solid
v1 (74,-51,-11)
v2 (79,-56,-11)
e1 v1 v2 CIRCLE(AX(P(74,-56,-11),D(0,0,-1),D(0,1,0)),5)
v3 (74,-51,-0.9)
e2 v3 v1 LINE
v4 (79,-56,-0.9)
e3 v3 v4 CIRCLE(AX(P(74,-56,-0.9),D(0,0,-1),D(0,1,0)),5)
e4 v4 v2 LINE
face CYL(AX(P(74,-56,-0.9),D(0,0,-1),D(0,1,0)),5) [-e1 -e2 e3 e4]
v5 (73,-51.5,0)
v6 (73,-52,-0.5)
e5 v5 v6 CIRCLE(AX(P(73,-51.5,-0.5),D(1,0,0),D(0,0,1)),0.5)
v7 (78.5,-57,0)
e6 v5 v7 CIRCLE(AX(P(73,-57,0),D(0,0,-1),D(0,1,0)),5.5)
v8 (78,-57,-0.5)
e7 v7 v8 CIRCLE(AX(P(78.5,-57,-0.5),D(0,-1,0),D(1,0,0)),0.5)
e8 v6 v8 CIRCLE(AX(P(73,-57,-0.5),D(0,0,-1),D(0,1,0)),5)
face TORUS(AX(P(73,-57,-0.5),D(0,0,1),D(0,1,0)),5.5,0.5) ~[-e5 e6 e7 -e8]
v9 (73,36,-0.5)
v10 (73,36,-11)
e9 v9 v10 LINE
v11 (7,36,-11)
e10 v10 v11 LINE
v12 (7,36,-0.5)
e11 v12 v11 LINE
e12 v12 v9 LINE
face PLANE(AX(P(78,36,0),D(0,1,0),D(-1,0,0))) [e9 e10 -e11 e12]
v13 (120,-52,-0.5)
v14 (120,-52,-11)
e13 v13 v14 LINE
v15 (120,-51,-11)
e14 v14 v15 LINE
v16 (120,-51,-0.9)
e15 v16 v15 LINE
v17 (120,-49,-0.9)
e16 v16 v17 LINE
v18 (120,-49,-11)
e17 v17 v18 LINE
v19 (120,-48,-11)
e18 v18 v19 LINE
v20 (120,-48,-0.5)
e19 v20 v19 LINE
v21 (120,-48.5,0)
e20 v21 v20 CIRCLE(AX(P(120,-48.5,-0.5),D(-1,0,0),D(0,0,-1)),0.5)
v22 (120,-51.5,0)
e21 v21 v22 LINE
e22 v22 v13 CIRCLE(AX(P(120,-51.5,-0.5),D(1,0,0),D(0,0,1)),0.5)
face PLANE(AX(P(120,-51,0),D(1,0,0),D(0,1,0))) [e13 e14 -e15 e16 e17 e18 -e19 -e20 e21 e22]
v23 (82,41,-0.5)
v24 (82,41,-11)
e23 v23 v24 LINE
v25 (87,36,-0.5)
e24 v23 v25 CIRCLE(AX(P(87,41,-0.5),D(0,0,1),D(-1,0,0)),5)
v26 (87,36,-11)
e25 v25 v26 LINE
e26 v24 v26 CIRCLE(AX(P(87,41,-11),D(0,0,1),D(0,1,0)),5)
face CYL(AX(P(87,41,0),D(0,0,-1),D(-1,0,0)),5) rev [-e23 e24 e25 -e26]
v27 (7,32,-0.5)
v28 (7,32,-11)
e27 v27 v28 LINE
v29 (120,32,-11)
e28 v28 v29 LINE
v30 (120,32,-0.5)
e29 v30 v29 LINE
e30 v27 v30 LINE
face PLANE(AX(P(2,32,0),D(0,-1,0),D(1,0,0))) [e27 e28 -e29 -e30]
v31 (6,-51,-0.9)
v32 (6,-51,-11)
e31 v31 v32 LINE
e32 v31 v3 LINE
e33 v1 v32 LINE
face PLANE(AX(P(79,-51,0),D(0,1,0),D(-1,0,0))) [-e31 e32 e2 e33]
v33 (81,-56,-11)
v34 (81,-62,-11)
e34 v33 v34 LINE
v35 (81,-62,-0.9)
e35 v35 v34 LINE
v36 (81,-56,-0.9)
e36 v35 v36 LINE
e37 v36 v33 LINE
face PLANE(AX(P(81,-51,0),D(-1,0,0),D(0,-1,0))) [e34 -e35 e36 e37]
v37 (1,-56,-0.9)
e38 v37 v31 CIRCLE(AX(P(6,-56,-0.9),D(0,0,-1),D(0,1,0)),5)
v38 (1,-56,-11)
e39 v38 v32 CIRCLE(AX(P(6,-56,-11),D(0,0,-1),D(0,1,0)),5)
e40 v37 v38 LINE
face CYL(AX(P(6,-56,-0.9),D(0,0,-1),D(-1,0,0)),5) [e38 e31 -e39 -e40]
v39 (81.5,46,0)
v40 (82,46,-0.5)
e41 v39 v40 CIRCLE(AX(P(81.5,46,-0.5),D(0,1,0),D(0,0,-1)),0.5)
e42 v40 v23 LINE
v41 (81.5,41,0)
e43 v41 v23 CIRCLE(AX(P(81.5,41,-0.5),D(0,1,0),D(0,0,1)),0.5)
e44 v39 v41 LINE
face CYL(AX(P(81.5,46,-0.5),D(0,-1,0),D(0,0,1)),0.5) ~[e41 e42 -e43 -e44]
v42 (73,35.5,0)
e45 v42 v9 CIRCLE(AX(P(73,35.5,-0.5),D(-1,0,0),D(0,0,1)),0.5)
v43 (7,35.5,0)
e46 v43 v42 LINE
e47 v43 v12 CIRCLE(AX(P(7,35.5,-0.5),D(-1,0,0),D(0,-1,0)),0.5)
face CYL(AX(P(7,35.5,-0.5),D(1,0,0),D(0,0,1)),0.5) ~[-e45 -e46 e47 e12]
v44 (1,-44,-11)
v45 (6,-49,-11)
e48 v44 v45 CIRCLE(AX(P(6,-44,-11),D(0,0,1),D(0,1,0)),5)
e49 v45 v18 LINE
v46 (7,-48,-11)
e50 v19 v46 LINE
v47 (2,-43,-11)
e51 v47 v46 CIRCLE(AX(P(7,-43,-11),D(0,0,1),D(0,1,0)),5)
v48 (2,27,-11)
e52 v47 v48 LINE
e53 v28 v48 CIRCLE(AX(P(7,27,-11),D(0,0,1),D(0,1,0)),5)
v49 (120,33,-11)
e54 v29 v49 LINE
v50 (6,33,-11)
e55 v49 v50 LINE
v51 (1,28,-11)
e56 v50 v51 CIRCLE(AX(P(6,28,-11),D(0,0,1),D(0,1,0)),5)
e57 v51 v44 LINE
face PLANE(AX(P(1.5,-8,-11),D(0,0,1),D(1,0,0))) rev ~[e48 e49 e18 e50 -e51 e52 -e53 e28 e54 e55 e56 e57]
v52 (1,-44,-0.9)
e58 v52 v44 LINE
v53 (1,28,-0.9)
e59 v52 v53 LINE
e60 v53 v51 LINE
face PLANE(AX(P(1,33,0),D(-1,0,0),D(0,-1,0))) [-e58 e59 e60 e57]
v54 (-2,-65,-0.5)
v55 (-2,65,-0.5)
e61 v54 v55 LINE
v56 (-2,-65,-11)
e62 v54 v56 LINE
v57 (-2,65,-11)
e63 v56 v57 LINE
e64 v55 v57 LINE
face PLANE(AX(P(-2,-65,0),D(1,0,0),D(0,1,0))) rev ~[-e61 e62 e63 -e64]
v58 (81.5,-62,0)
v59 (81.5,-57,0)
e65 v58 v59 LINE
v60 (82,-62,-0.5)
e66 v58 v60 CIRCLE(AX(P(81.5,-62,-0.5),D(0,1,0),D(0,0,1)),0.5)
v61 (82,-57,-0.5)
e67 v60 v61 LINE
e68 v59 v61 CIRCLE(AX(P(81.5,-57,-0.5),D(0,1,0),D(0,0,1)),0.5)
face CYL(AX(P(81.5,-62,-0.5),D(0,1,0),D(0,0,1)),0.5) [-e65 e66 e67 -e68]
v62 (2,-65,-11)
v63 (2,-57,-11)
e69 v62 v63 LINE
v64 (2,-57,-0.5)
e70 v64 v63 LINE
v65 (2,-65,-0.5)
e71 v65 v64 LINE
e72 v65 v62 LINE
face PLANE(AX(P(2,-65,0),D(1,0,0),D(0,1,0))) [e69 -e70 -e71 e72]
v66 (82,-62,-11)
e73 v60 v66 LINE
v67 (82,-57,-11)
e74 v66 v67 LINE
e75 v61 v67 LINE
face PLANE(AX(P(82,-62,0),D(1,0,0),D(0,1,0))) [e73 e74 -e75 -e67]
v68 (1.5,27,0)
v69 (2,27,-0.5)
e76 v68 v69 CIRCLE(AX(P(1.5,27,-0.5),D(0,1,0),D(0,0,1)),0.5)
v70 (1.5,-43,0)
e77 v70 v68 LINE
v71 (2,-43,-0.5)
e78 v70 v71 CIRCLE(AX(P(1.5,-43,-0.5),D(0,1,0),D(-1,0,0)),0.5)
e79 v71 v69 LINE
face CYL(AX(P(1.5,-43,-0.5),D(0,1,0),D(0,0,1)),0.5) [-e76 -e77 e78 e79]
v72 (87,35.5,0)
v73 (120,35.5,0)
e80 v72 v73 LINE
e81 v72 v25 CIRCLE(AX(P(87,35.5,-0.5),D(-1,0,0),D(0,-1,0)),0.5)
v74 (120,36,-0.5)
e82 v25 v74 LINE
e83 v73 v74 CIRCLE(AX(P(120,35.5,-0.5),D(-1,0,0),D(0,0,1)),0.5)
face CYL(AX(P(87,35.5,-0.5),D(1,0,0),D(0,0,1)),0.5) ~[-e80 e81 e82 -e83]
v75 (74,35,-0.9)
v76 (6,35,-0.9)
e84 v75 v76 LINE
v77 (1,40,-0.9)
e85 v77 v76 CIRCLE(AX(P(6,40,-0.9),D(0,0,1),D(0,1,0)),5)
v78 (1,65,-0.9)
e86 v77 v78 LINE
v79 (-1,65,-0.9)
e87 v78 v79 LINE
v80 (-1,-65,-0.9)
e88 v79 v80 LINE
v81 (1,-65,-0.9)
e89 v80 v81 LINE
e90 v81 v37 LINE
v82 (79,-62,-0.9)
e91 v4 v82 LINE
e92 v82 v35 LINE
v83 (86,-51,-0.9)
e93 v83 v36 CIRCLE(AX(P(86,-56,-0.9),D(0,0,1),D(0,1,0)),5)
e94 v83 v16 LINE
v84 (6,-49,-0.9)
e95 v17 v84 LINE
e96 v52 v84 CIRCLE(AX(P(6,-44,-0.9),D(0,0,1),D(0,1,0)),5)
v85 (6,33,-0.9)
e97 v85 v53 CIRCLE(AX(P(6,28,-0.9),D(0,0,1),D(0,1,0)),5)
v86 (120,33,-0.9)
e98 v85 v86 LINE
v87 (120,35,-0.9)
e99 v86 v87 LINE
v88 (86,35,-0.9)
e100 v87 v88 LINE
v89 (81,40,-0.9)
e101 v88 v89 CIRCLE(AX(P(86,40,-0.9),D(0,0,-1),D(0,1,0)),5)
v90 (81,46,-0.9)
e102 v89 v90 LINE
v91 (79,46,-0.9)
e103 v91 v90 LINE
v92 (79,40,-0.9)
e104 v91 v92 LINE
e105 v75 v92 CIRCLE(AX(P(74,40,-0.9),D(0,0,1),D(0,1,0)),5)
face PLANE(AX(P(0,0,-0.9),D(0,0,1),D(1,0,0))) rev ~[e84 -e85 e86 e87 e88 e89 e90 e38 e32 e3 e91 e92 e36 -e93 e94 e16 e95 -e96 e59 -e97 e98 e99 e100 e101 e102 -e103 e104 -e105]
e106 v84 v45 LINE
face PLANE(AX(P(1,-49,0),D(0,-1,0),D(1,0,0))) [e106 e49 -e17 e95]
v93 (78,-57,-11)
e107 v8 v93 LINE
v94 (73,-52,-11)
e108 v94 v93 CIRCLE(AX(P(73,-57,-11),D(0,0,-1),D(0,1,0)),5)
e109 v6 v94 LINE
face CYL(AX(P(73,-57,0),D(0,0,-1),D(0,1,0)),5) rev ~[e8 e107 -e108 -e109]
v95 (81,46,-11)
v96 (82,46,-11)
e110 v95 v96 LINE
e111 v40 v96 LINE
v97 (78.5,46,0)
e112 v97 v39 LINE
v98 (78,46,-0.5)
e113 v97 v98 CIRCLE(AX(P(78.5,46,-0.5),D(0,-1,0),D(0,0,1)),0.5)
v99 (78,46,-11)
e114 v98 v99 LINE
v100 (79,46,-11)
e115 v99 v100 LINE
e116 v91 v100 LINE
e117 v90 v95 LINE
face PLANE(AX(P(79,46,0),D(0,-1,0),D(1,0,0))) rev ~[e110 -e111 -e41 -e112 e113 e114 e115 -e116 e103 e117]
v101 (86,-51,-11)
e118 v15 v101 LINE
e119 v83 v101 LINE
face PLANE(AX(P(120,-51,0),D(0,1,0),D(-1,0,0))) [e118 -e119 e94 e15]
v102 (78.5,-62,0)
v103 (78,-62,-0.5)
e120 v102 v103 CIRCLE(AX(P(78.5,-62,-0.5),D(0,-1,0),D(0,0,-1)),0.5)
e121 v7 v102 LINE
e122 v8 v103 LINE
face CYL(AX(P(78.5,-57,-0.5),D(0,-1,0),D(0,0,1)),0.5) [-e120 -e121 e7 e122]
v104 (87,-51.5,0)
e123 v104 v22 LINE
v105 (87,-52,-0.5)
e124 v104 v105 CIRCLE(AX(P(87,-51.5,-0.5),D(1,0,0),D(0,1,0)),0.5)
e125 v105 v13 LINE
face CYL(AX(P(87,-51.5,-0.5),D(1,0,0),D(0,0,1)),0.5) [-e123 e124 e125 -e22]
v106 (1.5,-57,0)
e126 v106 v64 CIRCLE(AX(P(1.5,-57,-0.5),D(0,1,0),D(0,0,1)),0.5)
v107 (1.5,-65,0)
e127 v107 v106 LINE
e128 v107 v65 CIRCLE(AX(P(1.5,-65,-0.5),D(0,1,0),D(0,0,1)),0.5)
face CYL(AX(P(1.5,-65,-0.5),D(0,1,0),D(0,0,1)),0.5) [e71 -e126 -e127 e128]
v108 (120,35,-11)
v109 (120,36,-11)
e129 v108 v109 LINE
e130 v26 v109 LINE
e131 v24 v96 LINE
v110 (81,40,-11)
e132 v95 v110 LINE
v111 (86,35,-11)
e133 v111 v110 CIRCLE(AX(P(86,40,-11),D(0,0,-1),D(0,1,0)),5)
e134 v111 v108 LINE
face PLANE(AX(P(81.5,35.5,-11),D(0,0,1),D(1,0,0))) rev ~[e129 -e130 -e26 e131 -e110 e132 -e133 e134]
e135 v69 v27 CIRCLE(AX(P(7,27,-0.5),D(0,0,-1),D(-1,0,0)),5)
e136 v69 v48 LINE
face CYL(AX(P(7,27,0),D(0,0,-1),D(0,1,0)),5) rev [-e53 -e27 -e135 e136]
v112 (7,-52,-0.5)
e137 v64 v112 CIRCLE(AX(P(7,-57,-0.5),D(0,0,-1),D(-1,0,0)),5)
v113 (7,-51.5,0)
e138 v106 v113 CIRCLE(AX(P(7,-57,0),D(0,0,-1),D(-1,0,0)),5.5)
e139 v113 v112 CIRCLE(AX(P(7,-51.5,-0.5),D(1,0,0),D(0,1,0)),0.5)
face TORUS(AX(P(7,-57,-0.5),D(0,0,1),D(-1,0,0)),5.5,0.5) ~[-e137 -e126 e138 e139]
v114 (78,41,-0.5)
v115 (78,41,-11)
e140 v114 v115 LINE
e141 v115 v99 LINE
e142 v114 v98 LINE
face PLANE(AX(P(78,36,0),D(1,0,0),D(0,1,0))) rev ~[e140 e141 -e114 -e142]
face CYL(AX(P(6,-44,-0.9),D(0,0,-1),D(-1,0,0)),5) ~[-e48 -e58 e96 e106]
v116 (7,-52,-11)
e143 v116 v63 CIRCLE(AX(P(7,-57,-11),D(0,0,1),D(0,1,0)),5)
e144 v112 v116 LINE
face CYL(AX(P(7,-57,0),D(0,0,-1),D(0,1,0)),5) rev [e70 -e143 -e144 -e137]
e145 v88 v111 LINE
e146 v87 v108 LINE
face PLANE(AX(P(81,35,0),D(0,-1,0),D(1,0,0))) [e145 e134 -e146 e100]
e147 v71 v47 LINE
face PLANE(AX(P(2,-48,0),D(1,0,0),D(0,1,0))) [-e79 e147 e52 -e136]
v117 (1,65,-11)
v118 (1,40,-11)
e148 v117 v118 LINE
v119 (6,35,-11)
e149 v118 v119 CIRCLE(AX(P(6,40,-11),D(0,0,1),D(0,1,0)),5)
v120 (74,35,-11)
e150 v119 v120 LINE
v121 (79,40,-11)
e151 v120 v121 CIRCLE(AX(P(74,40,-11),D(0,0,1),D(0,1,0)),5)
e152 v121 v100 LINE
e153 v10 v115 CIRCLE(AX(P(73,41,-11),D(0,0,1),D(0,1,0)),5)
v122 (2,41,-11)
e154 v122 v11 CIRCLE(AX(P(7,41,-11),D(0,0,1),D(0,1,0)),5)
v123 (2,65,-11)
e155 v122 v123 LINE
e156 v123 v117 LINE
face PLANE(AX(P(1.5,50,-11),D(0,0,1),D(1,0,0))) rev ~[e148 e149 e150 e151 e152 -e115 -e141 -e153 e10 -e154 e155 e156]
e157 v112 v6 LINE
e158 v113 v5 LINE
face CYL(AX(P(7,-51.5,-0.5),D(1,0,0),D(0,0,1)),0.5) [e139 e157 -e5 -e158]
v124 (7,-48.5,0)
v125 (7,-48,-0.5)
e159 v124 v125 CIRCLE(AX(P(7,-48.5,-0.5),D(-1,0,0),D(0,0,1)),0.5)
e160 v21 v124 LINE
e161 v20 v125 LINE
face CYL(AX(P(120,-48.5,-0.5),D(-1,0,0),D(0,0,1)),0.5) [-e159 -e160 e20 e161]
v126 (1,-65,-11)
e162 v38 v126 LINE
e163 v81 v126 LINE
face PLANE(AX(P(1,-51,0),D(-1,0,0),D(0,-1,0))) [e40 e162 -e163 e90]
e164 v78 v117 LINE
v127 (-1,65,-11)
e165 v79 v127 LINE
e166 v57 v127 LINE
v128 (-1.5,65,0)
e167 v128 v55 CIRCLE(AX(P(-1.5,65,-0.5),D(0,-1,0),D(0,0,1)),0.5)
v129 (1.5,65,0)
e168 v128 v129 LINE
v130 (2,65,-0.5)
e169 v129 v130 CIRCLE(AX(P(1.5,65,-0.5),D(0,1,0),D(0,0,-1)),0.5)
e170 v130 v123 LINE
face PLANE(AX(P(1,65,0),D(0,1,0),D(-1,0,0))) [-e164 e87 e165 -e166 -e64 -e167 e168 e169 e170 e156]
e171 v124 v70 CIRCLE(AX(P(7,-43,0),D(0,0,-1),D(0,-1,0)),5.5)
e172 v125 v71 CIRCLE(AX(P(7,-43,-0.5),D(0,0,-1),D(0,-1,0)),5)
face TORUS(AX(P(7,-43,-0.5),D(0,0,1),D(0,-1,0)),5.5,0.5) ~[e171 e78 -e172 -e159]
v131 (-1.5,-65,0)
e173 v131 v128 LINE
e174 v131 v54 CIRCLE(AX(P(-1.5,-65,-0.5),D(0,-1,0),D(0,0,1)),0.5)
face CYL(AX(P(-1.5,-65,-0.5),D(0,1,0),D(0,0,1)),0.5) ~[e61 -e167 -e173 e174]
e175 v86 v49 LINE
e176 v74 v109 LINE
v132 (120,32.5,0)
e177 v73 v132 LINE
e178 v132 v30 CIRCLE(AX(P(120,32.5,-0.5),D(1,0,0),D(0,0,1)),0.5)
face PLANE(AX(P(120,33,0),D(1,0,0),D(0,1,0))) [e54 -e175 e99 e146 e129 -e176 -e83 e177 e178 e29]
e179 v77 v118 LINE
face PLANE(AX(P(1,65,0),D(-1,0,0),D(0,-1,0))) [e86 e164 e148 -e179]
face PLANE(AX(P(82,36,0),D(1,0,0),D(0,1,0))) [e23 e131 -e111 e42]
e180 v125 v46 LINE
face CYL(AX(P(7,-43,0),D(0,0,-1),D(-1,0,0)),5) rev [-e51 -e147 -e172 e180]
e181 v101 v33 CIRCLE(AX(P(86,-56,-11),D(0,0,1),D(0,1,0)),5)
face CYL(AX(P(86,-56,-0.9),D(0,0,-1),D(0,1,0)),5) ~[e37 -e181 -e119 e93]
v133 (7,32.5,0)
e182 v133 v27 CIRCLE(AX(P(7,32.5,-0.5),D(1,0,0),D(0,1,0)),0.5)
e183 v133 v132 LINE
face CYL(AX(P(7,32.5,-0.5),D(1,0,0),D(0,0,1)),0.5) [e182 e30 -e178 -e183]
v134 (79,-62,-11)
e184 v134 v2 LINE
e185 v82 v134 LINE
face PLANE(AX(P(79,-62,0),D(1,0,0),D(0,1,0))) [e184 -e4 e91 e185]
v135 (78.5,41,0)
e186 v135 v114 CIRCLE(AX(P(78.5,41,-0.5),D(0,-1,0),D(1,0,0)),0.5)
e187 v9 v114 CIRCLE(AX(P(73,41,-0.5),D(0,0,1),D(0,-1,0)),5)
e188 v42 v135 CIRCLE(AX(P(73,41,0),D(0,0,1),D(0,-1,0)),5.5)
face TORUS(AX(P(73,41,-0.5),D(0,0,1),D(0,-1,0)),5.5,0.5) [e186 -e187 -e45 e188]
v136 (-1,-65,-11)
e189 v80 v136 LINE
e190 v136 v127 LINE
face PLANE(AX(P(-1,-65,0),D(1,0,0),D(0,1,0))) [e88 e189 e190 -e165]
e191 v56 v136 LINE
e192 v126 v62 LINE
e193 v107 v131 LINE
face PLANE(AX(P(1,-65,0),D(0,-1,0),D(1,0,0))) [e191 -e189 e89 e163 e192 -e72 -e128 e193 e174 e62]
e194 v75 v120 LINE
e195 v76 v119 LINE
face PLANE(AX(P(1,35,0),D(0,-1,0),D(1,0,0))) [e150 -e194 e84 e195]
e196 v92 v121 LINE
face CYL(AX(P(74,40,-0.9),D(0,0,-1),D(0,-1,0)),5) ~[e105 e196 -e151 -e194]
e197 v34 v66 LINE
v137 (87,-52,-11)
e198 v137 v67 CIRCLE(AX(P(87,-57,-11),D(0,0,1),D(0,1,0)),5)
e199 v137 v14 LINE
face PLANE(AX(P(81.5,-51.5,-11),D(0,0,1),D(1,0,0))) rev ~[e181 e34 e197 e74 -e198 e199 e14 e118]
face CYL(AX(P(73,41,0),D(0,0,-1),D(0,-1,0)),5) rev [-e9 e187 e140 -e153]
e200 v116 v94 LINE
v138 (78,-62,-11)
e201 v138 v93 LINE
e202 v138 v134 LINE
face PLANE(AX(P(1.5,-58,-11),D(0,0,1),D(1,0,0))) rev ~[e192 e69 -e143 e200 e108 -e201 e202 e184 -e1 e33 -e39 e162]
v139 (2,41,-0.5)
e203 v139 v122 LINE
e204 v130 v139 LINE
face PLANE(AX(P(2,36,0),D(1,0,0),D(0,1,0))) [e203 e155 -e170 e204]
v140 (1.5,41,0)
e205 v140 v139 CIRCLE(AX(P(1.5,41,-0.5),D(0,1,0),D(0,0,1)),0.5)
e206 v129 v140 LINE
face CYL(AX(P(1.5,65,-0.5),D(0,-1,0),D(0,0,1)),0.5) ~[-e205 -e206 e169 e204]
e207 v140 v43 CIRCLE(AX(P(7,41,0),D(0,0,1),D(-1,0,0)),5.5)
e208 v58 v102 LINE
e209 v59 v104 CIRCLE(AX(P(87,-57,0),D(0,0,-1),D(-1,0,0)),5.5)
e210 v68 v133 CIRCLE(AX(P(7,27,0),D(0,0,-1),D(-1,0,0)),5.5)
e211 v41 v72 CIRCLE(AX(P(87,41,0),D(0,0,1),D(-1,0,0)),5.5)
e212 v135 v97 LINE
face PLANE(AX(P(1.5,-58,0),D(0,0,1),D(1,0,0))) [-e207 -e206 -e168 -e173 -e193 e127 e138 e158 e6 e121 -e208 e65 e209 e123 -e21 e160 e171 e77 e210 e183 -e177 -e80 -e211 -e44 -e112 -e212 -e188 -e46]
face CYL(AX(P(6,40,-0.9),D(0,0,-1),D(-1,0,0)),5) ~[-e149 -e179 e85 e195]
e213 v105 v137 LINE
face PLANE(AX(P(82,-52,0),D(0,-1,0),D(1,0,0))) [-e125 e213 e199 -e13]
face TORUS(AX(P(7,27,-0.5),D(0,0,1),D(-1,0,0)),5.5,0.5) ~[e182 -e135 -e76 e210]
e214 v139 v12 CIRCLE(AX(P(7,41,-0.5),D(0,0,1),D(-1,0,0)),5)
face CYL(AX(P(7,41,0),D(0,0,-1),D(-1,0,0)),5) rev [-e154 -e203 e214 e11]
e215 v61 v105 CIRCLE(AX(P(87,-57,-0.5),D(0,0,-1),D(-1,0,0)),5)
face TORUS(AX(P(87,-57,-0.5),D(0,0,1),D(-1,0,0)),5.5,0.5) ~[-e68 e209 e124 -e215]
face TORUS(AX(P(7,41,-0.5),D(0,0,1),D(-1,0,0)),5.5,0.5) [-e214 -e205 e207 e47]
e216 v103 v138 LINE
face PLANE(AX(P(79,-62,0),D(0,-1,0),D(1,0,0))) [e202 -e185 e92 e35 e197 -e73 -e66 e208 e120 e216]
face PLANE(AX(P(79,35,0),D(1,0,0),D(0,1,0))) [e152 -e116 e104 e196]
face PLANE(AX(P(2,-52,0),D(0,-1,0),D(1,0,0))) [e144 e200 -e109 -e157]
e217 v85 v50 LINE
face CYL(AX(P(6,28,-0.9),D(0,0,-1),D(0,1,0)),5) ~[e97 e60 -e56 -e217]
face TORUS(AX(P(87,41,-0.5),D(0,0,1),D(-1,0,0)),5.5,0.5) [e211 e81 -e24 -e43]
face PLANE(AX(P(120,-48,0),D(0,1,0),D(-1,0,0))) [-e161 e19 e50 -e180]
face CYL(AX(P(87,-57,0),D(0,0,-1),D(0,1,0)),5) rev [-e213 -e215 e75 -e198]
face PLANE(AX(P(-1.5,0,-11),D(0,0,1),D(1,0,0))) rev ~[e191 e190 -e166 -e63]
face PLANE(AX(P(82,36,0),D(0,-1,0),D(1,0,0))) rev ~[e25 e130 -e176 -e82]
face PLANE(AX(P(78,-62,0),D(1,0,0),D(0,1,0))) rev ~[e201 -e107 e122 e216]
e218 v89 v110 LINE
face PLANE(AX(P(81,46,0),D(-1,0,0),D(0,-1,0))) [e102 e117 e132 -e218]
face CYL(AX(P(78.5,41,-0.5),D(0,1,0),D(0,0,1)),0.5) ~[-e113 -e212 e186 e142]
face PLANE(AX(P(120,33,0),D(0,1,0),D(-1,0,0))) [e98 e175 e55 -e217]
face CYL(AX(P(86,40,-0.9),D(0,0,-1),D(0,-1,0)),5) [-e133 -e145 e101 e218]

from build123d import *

# Parameters (mm, degrees)
F0_W     = 2
F0_H     = 10
F0_H_2   = 1
F1_DEPTH = 0.9
F0_W_2   = 1
F0_H_3   = 130
F0_W_3   = 76
F0_W_4   = 38
F2_DEPTH = 11
F3_R     = 5
F4_R     = 0.5


with BuildPart() as f1:
    # F0 (on Top) → F1 (new body)
    with BuildSketch(Plane.XY):
        Polygon((-1, -65), (1, -65), (1, -51), (1, -49), (1, 33), (1, 35), (1, 65), (-1, 65), align=None)
        Polygon((1, 35), (1, 33), (2, 33), (79, 33), (81, 33), (120, 33), (120, 35), (82, 35), (81, 35), (79, 35), (78, 35), (2, 35), align=None)
        with Locations((80, 41)):
            Rectangle(F0_W, F0_H)
        with Locations((80, 35.5)):
            Rectangle(F0_W, F0_H_2)
        Polygon((1, -49), (1, -51), (2, -51), (78, -51), (79, -51), (81, -51), (82, -51), (120, -51), (120, -49), (81, -49), (79, -49), (2, -49), align=None)
        with Locations((80, -57)):
            Rectangle(F0_W, F0_H)
        with Locations((80, -51.5)):
            Rectangle(F0_W, F0_H_2)
    extrude(amount=-F1_DEPTH)

    # F0 (on Top) → F2 (join)
    with BuildSketch(Plane.XY):
        Polygon((1, -51), (1, -65), (2, -65), (2, -52), (2, -51), align=None)
        with Locations((-1.5, 0)):
            Rectangle(F0_W_2, F0_H_3)
        Polygon((1, 33), (1, -49), (2, -49), (2, -48), (2, 32), (2, 33), align=None)
        with Locations((40, -51.5)):
            Rectangle(F0_W_3, F0_H_2)
        Polygon((2, 65), (1, 65), (1, 35), (2, 35), (2, 36), align=None)
        Polygon((2, -48), (2, -49), (79, -49), (79, -48), (78, -48), align=None)
        with Locations((78.5, -51.5)):
            Rectangle(F0_W_2, F0_H_2)
        with Locations((78.5, -57)):
            Rectangle(F0_W_2, F0_H)
        Polygon((79, 33), (2, 33), (2, 32), (78, 32), (79, 32), align=None)
        with Locations((80, -48.5)):
            Rectangle(F0_W, F0_H_2)
        with Locations((40, 35.5)):
            Rectangle(F0_W_3, F0_H_2)
        with Locations((80, 32.5)):
            Rectangle(F0_W, F0_H_2)
        Polygon((81, -48), (81, -49), (120, -49), (120, -48), (82, -48), align=None)
        with Locations((81.5, -51.5)):
            Rectangle(F0_W_2, F0_H_2)
        with Locations((81.5, -57)):
            Rectangle(F0_W_2, F0_H)
        with Locations((78.5, 35.5)):
            Rectangle(F0_W_2, F0_H_2)
        with Locations((78.5, 41)):
            Rectangle(F0_W_2, F0_H)
        Polygon((120, 33), (81, 33), (81, 32), (82, 32), (120, 32), align=None)
        with Locations((101, -51.5)):
            Rectangle(F0_W_4, F0_H_2)
        with Locations((81.5, 35.5)):
            Rectangle(F0_W_2, F0_H_2)
        with Locations((81.5, 41)):
            Rectangle(F0_W_2, F0_H)
        with Locations((101, 35.5)):
            Rectangle(F0_W_4, F0_H_2)
    extrude(amount=-F2_DEPTH)

    # F3
    f3_edges = [f1.edges().sort_by_distance(p)[0] for p in [
        (78, -52, -5.5),
        (81, -51, -5.95),
        (82, -52, -5.5),
        (79, -51, -5.95),
        (1, -49, -5.95),
        (1, -51, -5.95),
        (2, -52, -5.5),
        (2, -48, -5.5),
        (2, 36, -5.5),
        (1, 33, -5.95),
        (1, 35, -5.95),
        (2, 32, -5.5),
        (81, 35, -5.95),
        (79, 35, -5.95),
        (82, 36, -5.5),
        (78, 36, -5.5),
    ]]
    fillet(f3_edges, radius=F3_R)

    # F4
    f4_edges = [f1.edges().sort_by_distance(p)[0] for p in [
        (63.5, 32, 0),
        (103.5, 36, 0),
        (82, 43.5, 0),
        (78, 43.5, 0),
        (40, 36, 0),
        (2, 53, 0),
        (40, -52, 0),
        (103.5, -52, 0),
        (-2, 0, 0),
        (2, -61, 0),
        (3.464466, -53.464466, 0),
        (76.535534, -53.464466, 0),
        (78, -59.5, 0),
        (3.464466, 37.464466, 0),
        (82, -59.5, 0),
        (83.464466, -53.464466, 0),
        (76.535534, 37.464466, 0),
        (63.5, -48, 0),
        (3.464466, -46.535534, 0),
        (83.464466, 37.464466, 0),
        (2, -8, 0),
        (3.464466, 30.535534, 0),
    ]]
    fillet(f4_edges, radius=F4_R)


solid = f1.part
